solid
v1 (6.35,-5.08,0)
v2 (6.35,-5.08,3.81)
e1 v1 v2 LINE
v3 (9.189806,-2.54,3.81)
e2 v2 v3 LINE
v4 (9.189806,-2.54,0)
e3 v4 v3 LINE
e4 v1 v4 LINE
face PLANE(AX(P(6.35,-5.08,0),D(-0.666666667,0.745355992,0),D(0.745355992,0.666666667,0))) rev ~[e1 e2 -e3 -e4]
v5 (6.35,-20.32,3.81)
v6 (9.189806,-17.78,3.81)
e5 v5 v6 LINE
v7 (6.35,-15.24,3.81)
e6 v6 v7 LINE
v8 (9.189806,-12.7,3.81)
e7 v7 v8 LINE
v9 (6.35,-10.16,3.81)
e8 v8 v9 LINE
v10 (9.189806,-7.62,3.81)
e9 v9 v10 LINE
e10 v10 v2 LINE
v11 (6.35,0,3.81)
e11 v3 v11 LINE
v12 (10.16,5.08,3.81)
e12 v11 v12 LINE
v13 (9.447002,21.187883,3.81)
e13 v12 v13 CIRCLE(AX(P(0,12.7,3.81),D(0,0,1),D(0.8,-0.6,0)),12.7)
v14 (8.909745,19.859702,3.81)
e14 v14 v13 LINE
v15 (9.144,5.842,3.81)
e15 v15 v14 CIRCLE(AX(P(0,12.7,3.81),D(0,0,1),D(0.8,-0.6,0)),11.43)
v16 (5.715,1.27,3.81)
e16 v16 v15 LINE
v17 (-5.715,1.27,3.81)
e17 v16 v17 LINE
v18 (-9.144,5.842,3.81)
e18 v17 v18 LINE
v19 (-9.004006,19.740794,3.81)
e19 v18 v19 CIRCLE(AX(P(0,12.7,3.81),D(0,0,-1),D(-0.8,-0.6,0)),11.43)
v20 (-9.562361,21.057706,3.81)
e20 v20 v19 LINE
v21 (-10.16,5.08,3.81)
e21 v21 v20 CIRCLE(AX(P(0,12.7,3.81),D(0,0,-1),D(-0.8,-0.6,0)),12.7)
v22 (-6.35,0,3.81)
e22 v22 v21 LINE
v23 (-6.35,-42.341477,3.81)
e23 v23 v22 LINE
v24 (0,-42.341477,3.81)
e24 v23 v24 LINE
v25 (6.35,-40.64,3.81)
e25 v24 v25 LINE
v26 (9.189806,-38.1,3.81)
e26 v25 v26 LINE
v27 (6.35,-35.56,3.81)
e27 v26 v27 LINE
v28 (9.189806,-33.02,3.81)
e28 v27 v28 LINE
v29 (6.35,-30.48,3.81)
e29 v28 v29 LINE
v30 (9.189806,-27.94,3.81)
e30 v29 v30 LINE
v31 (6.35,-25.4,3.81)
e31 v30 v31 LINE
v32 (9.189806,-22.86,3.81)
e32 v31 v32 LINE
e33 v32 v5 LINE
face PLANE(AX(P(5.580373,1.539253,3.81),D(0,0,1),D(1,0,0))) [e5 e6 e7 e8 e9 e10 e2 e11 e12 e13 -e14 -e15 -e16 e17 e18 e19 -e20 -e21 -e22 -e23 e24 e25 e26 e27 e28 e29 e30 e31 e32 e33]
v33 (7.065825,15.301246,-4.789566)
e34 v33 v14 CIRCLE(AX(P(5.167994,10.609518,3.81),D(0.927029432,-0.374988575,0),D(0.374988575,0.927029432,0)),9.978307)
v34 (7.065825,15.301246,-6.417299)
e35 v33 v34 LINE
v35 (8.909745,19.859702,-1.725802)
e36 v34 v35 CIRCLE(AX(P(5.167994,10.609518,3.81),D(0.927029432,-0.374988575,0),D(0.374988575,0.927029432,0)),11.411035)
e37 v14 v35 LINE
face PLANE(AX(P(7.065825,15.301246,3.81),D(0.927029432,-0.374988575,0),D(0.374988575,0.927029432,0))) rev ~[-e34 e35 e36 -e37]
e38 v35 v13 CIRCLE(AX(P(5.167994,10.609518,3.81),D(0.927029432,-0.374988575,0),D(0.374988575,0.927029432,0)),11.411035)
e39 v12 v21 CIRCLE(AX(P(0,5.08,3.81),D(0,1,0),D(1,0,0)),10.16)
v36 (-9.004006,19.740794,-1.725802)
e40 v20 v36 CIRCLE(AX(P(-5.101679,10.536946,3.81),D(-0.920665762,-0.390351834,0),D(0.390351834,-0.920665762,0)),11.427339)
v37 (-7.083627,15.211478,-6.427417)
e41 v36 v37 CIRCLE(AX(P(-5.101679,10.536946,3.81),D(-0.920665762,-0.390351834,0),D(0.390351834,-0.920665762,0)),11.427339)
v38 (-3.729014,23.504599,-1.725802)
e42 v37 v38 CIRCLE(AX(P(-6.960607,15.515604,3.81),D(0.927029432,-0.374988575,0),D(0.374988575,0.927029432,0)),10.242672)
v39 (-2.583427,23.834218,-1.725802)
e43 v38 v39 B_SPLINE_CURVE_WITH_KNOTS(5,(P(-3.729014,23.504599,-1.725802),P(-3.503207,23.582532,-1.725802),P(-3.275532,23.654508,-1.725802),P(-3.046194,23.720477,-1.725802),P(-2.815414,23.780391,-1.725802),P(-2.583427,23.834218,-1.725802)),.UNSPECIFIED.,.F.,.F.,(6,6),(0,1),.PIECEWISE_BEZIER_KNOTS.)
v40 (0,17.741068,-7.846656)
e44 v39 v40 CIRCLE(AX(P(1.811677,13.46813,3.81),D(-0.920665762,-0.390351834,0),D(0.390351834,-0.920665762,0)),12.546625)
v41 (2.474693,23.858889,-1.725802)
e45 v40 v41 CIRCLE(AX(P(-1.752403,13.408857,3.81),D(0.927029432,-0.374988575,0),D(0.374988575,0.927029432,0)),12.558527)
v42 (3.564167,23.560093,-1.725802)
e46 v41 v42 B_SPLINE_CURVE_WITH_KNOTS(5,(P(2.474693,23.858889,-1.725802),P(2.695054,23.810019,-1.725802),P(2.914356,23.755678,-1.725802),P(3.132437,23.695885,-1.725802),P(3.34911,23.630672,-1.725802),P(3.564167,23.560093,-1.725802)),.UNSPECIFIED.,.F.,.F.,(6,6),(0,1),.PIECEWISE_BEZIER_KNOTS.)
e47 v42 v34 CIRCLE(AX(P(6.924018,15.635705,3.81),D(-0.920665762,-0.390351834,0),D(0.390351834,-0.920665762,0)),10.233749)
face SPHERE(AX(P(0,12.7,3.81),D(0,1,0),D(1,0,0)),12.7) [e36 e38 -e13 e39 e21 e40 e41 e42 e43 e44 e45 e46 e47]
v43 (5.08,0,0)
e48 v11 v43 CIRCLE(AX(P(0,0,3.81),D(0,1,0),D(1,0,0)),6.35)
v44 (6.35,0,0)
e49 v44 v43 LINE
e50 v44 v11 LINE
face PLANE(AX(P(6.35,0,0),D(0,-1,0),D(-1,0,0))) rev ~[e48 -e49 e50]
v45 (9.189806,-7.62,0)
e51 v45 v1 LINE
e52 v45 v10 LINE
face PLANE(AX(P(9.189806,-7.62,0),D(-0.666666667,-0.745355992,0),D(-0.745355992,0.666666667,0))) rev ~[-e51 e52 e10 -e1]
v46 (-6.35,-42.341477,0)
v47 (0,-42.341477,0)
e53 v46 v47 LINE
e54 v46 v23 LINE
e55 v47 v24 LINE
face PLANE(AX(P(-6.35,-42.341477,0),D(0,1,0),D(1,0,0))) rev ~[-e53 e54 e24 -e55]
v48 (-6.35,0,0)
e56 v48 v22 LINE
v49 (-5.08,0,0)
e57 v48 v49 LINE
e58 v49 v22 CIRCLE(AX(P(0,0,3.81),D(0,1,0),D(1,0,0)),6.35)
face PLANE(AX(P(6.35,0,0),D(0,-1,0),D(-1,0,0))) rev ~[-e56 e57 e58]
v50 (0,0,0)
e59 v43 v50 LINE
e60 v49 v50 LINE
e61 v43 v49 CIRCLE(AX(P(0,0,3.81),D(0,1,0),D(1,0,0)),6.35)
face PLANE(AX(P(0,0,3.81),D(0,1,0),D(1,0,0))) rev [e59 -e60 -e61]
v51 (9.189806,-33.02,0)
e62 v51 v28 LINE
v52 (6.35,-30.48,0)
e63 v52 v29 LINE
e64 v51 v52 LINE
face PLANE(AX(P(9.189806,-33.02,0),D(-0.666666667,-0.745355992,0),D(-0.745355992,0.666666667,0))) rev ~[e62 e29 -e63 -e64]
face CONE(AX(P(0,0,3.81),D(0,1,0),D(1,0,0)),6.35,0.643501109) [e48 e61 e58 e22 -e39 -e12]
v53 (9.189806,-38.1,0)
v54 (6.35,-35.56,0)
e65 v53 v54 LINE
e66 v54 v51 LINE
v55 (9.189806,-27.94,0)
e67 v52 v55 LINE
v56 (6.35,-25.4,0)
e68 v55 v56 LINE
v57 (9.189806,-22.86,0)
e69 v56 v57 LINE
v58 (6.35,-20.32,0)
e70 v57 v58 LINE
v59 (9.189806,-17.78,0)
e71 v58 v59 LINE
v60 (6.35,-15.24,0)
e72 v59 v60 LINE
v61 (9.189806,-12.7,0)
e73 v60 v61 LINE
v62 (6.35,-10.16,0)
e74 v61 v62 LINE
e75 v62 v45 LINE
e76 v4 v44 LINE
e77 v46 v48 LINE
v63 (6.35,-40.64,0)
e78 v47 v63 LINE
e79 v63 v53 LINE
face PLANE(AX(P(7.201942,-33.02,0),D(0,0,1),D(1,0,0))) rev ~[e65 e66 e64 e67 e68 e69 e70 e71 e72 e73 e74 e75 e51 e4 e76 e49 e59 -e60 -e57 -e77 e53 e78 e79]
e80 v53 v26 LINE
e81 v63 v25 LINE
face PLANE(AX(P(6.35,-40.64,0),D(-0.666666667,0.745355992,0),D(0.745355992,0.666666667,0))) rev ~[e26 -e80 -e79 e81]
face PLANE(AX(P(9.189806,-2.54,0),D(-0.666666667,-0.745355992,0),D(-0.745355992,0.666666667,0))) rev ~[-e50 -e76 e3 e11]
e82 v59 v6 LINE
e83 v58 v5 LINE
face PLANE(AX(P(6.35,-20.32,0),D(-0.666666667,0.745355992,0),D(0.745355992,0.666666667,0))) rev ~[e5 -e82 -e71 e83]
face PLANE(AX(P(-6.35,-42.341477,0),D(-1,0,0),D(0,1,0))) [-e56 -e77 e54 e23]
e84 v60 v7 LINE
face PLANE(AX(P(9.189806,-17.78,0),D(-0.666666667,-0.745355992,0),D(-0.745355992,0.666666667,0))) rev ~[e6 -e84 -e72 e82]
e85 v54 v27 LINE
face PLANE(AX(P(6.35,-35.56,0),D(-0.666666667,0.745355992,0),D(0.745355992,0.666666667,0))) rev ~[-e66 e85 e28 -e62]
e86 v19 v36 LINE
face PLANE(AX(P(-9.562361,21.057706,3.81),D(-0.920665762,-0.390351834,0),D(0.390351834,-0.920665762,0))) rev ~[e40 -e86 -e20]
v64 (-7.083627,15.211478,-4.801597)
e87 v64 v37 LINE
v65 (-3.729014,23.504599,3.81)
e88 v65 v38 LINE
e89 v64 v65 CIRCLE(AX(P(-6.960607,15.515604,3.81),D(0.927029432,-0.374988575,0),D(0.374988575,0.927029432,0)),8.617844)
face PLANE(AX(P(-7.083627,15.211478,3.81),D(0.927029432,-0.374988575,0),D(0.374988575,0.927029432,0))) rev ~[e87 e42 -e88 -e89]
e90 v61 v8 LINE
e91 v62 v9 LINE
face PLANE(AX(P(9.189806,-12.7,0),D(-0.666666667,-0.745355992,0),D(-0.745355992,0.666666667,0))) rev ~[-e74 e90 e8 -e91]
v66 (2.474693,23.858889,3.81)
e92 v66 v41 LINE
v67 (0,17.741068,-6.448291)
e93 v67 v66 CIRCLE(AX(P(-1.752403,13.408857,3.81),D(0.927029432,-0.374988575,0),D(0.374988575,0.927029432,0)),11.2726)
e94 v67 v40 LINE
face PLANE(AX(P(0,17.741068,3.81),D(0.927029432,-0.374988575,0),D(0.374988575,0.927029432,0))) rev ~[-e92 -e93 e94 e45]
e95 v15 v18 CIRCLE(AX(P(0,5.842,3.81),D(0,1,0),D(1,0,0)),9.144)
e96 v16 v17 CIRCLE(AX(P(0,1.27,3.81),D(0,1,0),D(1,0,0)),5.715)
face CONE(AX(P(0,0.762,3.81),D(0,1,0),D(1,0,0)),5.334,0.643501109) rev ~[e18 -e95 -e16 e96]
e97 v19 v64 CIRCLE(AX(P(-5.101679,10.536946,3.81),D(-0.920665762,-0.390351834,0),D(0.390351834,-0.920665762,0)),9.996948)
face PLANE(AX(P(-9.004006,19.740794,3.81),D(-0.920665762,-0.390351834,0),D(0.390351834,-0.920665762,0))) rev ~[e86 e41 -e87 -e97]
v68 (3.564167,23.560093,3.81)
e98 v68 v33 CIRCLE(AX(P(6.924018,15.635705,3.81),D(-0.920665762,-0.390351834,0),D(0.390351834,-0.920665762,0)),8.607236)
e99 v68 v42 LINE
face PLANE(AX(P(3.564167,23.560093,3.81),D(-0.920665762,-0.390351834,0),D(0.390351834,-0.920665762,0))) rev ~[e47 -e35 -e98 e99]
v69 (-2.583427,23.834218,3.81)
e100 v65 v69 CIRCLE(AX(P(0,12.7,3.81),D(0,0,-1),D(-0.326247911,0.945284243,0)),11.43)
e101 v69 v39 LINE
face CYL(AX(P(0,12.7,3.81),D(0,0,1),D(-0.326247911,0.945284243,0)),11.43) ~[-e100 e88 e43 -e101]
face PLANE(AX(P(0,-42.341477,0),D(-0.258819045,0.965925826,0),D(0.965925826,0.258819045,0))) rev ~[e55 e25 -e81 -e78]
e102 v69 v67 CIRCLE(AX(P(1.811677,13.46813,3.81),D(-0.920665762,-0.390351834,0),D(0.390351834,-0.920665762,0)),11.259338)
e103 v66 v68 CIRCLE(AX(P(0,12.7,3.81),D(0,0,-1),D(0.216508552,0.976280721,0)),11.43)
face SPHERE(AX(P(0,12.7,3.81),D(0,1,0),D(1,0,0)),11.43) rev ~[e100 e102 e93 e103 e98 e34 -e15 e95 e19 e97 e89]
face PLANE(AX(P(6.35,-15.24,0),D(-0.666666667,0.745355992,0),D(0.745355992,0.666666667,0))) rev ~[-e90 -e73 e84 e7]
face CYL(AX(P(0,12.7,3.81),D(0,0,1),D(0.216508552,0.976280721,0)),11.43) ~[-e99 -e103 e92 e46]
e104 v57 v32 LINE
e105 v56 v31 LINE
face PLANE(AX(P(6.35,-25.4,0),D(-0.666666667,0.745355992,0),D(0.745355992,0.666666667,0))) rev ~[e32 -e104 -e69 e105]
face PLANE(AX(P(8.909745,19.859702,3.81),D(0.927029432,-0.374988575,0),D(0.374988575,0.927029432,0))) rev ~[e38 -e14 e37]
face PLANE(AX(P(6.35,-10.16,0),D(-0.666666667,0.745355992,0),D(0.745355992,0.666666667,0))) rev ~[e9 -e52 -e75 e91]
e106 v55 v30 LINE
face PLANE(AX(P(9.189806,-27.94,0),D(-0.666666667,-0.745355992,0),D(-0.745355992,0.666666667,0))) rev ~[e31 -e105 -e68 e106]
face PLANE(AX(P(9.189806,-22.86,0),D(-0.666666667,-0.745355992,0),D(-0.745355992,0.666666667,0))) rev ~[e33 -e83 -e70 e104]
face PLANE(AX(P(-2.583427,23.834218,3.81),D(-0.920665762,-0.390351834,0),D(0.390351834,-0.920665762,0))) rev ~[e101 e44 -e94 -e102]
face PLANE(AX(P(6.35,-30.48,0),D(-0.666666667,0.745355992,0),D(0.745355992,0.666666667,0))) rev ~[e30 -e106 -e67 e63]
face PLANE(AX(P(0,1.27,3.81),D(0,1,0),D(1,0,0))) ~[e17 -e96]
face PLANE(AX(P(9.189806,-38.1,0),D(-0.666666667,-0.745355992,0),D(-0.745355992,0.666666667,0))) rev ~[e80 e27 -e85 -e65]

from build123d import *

# Parameters (mm, degrees)
F0_W     = 6.35
F0_H     = 42.3414773719
F1_DEPTH = 3.81
F3_ANGLE = 180
F4_T     = -1.27
F7_DEPTH = 25.4


# Not quite as in the source:
# - a feature names something its author has since deleted; it is built from what else it names


with BuildPart() as f1:
    # F0 (on Top) → F1 (new body)
    with BuildSketch(Plane.XY):
        Polygon((6.35, -30.48), (6.35, -35.56), (9.1898063314, -33.02), align=None)
        Polygon((6.35, -35.56), (6.35, -40.64), (9.1898063314, -38.1), align=None)
        Polygon((6.35, -25.4), (6.35, -30.48), (9.1898063314, -27.94), align=None)
        Polygon((6.35, -20.32), (6.35, -25.4), (9.1898063314, -22.86), align=None)
        Polygon((9.1898063314, -17.78), (6.35, -15.24), (6.35, -20.32), align=None)
        Polygon((9.1898063314, -12.7), (6.35, -10.16), (6.35, -15.24), align=None)
        Polygon((9.1898063314, -7.62), (6.35, -5.08), (6.35, -10.16), align=None)
        Polygon((9.1898063314, -2.54), (6.35, 0), (6.35, -5.08), align=None)
        Polygon((6.35, 0), (0, 0), (0, -42.3414773719), (6.35, -40.64), (6.35, -35.56), (6.35, -30.48), (6.35, -25.4), (6.35, -20.32), (6.35, -15.24), (6.35, -10.16), (6.35, -5.08), align=None)
        with Locations((-3.175, -21.170738686)):
            Rectangle(F0_W, F0_H)
    extrude(amount=F1_DEPTH)


with BuildPart() as f3:
    # F2 (on face) → F3 (revolve)
    with BuildSketch(Plane.XY.offset(3.81)):
        with BuildLine():
            ThreePointArc((10.16, 5.08), (5.6796126628, 1.3407746743), (0, 0))
            Line((0, 0), (6.35, 0))
            Line((6.35, 0), (10.16, 5.08))
        make_face()
        with BuildLine():
            Line((0, 25.4), (0, 0))
            ThreePointArc((0, 0), (5.6796126628, 1.3407746743), (10.16, 5.08))
            ThreePointArc((10.16, 5.08), (11.3592253257, 18.3796126628), (0, 25.4))
        make_face()
    revolve(axis=Axis((0, 12.7, 3.81), (0, 1, 0)), revolution_arc=F3_ANGLE)

    # F4
    f4_openings = [f3.faces().sort_by_distance(p)[0] for p in [
        (0, 12.436594, 3.81),
    ]]
    offset(amount=F4_T, openings=f4_openings)


with BuildPart() as f1_1:
    add(f1.part)

    # F5: union F3
    add(f3.part)

    # F6 (on face) → F7 (cut)
    with BuildSketch(Plane.XY.offset(3.81)):
        with BuildLine():
            Line((8.9097454996, 19.8597021678), (9.4470019608, 21.1878827721))
            ThreePointArc((9.4470019608, 21.1878827721), (5.1717448117, 24.299269615), (0, 25.4))
            ThreePointArc((0, 25.4), (-1.5546529222, 25.304485483), (-3.0859212896, 25.0193786286))
            Line((-3.0859212896, 25.0193786286), (-2.5834265714, 23.8342178508))
            ThreePointArc((-2.5834265714, 23.8342178508), (-1.3001519074, 24.0558137101), (0, 24.13))
            ThreePointArc((0, 24.13), (1.2447495309, 24.0620200055), (2.4746927509, 23.8588886449))
            Line((2.4746927509, 23.8588886449), (2.9447663441, 25.0209828664))
            Line((2.9447663441, 25.0209828664), (3.5641672216, 23.5600926339))
            ThreePointArc((3.5641672216, 23.5600926339), (6.5056012054, 22.0979813234), (8.9097454996, 19.8597021678))
        make_face()
        with BuildLine():
            Line((7.0658245088, 15.3012458764), (8.9097454996, 19.8597021678))
            ThreePointArc((8.9097454996, 19.8597021678), (6.5056012054, 22.0979813234), (3.5641672216, 23.5600926339))
            Line((3.5641672216, 23.5600926339), (7.0658245088, 15.3012458764))
        make_face()
        with BuildLine():
            ThreePointArc((2.4746927509, 23.8588886449), (3.0231237497, 23.7229588947), (3.5641672216, 23.5600926339))
            Line((3.5641672216, 23.5600926339), (2.9447663441, 25.0209828664))
            Line((2.9447663441, 25.0209828664), (2.4746927509, 23.8588886449))
        make_face()
        with BuildLine():
            Line((-2.5834265714, 23.8342178508), (-3.0859212896, 25.0193786286))
            ThreePointArc((-3.0859212896, 25.0193786286), (-3.1028243507, 25.0151321978), (-3.1197215685, 25.0108625748))
            Line((-3.1197215685, 25.0108625748), (-3.7290136249, 23.5045988998))
            ThreePointArc((-3.7290136249, 23.5045988998), (-3.1605201267, 23.6843530774), (-2.5834265714, 23.8342178508))
        make_face()
        with BuildLine():
            Line((0, 17.7410675473), (2.4746927509, 23.8588886449))
            ThreePointArc((2.4746927509, 23.8588886449), (1.2447495309, 24.0620200055), (0, 24.13))
            ThreePointArc((0, 24.13), (-1.3001519074, 24.0558137101), (-2.5834265714, 23.8342178508))
            Line((-2.5834265714, 23.8342178508), (0, 17.7410675473))
        make_face()
        with BuildLine():
            Line((-3.7290136249, 23.5045988998), (-3.1197215685, 25.0108625748))
            ThreePointArc((-3.1197215685, 25.0108625748), (-6.6419627447, 23.5247092754), (-9.562361361, 21.0577057379))
            Line((-9.562361361, 21.0577057379), (-9.0040057437, 19.7407940296))
            ThreePointArc((-9.0040057437, 19.7407940296), (-6.6388253732, 22.0043483202), (-3.7290136249, 23.5045988998))
        make_face()
        with BuildLine():
            Line((-7.0836272172, 15.211478147), (-3.7290136249, 23.5045988998))
            ThreePointArc((-3.7290136249, 23.5045988998), (-6.6388253732, 22.0043483202), (-9.0040057437, 19.7407940296))
            Line((-9.0040057437, 19.7407940296), (-7.0836272172, 15.211478147))
        make_face()
    extrude(amount=-F7_DEPTH, mode=Mode.SUBTRACT)


solid = f1_1.part
